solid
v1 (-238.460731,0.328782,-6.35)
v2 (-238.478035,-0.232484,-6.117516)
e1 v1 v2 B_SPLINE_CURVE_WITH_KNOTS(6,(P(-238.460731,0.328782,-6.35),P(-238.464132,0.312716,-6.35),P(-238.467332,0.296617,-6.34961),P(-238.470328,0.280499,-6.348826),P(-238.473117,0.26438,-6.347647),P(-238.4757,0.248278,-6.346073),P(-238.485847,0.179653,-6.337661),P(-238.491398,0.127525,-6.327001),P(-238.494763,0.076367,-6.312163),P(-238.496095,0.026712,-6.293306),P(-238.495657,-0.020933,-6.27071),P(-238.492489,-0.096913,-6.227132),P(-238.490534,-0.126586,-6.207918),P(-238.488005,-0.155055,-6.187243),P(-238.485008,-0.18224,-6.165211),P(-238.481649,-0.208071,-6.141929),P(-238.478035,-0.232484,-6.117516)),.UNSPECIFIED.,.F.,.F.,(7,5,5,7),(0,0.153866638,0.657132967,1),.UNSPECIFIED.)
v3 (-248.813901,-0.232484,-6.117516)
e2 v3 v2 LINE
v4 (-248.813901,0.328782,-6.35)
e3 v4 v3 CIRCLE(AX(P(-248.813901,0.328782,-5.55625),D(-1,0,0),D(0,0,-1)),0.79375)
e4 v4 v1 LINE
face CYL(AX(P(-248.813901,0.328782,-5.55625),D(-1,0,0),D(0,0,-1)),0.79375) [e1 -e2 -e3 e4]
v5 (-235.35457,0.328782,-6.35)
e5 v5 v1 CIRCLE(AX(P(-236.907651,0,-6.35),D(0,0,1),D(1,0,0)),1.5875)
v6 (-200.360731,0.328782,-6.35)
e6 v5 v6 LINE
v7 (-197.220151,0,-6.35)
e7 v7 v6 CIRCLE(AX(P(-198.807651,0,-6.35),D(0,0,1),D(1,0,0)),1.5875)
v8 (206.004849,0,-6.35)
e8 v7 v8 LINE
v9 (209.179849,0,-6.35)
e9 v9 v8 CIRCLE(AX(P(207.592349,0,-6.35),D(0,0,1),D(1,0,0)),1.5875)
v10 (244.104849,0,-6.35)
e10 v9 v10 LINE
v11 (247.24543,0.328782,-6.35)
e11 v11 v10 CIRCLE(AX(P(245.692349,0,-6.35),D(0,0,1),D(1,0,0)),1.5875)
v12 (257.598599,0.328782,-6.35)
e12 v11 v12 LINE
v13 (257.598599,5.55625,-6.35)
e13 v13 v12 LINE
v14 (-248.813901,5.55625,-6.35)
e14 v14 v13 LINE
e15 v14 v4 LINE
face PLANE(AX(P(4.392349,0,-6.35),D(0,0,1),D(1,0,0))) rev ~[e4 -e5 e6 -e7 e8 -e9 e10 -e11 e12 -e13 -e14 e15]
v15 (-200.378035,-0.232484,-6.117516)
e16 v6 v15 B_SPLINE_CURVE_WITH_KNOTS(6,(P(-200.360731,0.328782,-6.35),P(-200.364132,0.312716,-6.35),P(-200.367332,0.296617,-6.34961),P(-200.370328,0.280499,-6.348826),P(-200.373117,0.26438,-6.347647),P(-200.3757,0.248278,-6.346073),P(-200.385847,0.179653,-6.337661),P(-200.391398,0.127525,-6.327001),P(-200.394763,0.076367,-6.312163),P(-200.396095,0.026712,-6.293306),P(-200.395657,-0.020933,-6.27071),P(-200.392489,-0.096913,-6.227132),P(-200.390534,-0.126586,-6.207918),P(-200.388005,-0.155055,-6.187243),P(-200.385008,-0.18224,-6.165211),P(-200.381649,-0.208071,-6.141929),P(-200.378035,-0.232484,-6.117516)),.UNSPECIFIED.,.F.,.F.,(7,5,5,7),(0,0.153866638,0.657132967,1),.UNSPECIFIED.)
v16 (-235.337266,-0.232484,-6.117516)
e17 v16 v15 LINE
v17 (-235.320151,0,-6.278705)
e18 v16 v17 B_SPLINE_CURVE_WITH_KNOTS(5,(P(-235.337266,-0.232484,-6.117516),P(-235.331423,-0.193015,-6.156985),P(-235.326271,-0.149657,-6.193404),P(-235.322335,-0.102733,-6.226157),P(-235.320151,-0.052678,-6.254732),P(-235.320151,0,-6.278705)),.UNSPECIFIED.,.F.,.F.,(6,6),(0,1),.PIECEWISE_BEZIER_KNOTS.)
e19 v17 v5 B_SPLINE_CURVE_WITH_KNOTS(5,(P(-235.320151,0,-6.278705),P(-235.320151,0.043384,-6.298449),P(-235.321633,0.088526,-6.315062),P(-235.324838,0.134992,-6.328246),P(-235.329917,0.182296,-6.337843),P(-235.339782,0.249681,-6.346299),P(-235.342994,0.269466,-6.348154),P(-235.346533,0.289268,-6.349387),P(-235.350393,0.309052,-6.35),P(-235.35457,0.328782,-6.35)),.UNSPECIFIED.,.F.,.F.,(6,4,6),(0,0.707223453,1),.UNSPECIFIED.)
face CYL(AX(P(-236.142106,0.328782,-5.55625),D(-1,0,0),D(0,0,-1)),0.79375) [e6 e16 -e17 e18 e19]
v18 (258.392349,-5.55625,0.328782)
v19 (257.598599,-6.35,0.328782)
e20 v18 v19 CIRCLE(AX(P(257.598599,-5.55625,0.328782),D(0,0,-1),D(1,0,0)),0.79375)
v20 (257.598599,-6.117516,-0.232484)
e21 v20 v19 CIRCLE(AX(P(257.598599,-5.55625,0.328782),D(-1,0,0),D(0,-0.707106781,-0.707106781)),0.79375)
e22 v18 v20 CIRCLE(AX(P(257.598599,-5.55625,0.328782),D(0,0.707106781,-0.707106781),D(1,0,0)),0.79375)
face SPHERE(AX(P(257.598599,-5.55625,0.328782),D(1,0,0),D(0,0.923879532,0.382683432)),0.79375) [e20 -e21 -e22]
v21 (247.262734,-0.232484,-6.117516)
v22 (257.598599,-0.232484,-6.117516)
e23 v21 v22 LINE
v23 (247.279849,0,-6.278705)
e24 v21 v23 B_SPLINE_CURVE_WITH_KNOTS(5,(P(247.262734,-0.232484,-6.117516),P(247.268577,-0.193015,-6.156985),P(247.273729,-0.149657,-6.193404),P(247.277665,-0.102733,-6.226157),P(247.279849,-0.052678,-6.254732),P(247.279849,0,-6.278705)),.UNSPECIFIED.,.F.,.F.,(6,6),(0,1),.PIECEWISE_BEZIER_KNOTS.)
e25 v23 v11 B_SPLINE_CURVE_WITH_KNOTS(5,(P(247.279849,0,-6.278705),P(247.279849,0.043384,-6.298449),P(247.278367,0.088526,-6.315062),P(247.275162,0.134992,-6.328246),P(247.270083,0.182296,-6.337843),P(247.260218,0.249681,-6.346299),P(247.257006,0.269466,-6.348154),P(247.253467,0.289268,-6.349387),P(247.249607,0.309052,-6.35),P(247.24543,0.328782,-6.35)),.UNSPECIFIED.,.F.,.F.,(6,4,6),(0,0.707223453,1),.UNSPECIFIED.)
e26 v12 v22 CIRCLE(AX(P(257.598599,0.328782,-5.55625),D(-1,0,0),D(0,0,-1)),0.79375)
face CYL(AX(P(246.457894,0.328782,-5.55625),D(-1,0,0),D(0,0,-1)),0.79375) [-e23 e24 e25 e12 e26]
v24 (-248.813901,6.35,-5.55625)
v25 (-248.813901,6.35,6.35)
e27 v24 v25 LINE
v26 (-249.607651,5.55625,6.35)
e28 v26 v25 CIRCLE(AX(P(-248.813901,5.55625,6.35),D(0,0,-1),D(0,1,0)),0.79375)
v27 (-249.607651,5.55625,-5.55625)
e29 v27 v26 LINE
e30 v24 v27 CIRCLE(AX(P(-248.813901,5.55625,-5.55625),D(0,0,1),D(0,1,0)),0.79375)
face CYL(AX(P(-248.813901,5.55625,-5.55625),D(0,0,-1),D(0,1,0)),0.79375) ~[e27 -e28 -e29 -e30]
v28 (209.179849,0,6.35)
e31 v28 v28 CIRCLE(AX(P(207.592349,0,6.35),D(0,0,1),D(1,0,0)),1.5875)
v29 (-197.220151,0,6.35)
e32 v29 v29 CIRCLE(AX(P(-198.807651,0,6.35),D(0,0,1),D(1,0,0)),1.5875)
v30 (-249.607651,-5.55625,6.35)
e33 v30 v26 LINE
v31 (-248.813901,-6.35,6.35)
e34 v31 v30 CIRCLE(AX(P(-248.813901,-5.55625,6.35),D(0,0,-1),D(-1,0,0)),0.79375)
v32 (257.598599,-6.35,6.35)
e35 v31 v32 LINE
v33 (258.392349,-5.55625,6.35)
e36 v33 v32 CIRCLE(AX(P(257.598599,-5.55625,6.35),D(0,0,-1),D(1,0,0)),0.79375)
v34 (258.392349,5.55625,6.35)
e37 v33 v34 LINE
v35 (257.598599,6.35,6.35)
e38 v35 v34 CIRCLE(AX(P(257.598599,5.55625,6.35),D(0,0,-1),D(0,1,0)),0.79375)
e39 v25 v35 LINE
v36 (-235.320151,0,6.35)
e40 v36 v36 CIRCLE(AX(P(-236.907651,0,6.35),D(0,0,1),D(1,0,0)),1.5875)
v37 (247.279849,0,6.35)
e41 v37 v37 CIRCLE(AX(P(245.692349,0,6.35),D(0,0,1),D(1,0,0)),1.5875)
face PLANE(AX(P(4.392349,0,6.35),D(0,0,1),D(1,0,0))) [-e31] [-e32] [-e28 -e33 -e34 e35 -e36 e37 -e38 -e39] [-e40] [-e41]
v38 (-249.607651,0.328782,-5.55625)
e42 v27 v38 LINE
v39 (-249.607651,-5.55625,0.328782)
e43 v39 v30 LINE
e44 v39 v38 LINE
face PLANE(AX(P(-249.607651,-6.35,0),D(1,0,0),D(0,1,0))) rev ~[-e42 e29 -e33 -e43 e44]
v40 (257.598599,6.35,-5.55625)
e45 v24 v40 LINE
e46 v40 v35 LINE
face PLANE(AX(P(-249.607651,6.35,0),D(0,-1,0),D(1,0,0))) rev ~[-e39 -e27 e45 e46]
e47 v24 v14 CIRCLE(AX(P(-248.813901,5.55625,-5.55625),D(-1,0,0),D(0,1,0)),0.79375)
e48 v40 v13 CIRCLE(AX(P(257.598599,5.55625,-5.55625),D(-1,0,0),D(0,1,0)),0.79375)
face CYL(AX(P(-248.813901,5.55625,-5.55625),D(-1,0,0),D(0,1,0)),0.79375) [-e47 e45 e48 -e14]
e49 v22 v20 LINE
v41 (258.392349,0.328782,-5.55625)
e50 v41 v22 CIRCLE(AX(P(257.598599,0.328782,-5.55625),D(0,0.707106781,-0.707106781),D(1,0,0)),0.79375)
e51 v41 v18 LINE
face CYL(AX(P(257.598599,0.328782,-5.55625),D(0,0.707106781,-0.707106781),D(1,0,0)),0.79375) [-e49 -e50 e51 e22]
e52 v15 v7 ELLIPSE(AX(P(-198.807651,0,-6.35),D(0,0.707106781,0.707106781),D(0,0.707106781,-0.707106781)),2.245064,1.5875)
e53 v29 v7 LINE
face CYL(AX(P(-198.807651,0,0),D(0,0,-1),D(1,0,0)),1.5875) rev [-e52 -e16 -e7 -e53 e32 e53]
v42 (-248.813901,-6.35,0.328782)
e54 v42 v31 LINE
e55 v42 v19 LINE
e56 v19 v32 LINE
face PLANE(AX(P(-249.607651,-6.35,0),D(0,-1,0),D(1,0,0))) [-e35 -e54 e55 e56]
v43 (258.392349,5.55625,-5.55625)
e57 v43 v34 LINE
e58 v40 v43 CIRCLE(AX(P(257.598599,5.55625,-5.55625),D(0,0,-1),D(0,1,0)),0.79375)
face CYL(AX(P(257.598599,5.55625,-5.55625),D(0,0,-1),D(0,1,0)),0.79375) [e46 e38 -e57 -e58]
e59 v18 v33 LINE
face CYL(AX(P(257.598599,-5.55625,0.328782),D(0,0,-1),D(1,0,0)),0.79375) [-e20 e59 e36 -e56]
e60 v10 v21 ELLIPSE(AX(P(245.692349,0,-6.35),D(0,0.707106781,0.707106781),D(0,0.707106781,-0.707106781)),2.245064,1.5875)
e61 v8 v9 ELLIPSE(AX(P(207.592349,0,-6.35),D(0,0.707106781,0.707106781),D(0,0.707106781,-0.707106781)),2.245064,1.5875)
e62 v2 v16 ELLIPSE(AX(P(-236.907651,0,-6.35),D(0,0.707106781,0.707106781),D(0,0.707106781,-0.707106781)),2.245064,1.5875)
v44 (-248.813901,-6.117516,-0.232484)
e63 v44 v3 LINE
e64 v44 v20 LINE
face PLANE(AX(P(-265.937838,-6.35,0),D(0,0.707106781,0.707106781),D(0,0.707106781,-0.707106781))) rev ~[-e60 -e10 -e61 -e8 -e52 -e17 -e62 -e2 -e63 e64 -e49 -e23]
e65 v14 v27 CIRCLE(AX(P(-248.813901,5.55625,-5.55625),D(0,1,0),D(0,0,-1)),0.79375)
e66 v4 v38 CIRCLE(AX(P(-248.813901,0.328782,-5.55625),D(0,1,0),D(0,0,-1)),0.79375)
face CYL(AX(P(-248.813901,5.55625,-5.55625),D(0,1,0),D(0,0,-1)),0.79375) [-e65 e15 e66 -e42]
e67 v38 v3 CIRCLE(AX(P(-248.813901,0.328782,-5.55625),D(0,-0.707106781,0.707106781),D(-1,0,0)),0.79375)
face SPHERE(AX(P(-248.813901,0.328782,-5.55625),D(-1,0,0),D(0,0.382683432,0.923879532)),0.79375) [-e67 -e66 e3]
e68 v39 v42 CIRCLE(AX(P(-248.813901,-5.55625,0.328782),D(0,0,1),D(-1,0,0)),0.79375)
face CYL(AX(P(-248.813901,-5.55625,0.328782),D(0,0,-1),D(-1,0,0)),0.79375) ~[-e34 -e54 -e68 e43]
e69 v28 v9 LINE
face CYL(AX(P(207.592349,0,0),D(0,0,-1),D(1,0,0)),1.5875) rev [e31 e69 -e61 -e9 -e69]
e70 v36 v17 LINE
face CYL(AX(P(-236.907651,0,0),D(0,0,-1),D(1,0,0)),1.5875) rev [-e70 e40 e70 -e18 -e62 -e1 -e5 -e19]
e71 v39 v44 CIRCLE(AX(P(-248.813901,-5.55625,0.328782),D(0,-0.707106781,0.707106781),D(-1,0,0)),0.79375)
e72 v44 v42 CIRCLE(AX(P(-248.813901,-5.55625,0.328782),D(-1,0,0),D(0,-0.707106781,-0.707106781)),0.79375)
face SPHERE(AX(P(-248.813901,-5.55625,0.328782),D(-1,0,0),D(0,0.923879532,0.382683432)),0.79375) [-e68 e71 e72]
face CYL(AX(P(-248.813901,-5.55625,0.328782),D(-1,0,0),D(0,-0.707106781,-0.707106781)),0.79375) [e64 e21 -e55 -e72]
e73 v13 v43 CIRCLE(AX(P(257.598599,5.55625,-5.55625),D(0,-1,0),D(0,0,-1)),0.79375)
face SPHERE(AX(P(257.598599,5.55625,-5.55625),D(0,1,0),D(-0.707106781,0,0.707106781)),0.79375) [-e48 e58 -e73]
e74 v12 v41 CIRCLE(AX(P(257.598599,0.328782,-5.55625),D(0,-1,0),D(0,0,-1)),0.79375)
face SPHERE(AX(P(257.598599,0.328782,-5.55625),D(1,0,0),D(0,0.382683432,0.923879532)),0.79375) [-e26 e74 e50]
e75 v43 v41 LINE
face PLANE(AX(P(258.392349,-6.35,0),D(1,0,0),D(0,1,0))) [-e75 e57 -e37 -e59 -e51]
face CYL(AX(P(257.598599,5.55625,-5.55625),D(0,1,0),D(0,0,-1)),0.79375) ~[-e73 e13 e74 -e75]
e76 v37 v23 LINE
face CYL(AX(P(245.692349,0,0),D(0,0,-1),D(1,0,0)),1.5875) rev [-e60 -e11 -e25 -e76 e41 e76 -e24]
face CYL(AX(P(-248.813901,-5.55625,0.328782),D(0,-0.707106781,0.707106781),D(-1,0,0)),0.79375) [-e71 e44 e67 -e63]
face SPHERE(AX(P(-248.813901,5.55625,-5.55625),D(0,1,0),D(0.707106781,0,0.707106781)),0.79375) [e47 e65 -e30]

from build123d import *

# Parameters (mm, degrees)
F0_W         = 508
F0_H         = 12.7
F0_R         = 1.5875
F1_DEPTH     = 6.35
F2_T1_DEPTH  = 540.6603739472
F3_T1_DEPTH  = 8.3226920908
F3_T3_DEPTH  = 8.0055929849
F3_T5_DEPTH  = 5.2274679849
F3_T7_DEPTH  = 13.890625
F3_T9_DEPTH  = 8.3226920908
F3_T11_DEPTH = 506.4125
F3_T13_DEPTH = 11.1407050378
F3_T15_DEPTH = 36.5689100757
F3_T17_DEPTH = 11.1407050378
F3_T22_DEPTH = 0.809625
F3_T28_DEPTH = 0.809625
F3_S33_W     = 0.809625
F3_S33_H     = 0.809625
F3_T34_DEPTH = 0.809625
F3_T40_DEPTH = 0.809625
F3_T46_DEPTH = 0.809625
F3_S51_W     = 0.809625
F3_S51_H     = 0.809625
F3_T52_DEPTH = 0.809625


# Not quite as in the source:
# - a fillet or chamfer that OpenCascade refuses, or shapes differently, is made with other operations: its cross-section is extruded or revolved along the edge and cut away or added


with BuildPart() as f1:
    # F0 (on Top) → F1 (new body, symmetric)
    with BuildSketch(Plane.XY):
        with Locations((4.392349353, 0)):
            Rectangle(F0_W, F0_H)
        with Locations((-236.907650647, 0)):
            Circle(F0_R, mode=Mode.SUBTRACT)
        with Locations((-198.807650647, 0)):
            Circle(F0_R, mode=Mode.SUBTRACT)
        with Locations((207.592349353, 0)):
            Circle(F0_R, mode=Mode.SUBTRACT)
        with Locations((245.692349353, 0)):
            Circle(F0_R, mode=Mode.SUBTRACT)
    extrude(amount=F1_DEPTH, both=True)

    # F2: chamfer of 6.35 on 1 edges, made by hand

    # F2_s2 → F2_t1 (cut)
    with BuildSketch(Plane.YZ.offset(-265.9378376206)):
        Polygon((-6.35, 0), (0, -6.35), (-6.35, -6.35), align=None)
    extrude(amount=F2_T1_DEPTH, mode=Mode.SUBTRACT)

    # F3: fillet of radius 0.79375 on 13 edges, made by hand

    # F3_s2 → F3_t1 (cut)
    with BuildSketch(Plane(origin=(0, 2.9425160076, -2.9425160076), x_dir=(1, 0, 0), z_dir=(0, -0.7071067812, 0.7071067812))):
        with BuildLine():
            ThreePointArc((258.392349353, -3.6963780605), (258.1598653606, -4.2576440681), (257.598599353, -4.4901280605))
            Line((257.598599353, -4.4901280605), (258.392349353, -4.4901280605))
            Line((258.392349353, -4.4901280605), (258.392349353, -3.6963780605))
        make_face()
    extrude(amount=F3_T1_DEPTH, mode=Mode.SUBTRACT)

    # F3_s4 → F3_t3 (cut)
    with BuildSketch(Plane.XY.offset(0.3287820151)):
        with BuildLine():
            ThreePointArc((258.392349353, -5.55625), (258.1598653606, -6.1175160076), (257.598599353, -6.35))
            Line((257.598599353, -6.35), (258.392349353, -6.35))
            Line((258.392349353, -6.35), (258.392349353, -5.55625))
        make_face()
        with BuildLine():
            ThreePointArc((-249.607650647, -5.55625), (-249.3751666546, -6.1175160076), (-248.813900647, -6.35))
            Line((-248.813900647, -6.35), (-249.607650647, -6.35))
            Line((-249.607650647, -6.35), (-249.607650647, -5.55625))
        make_face()
    extrude(amount=F3_T3_DEPTH, mode=Mode.SUBTRACT)

    # F3_s6 → F3_t5 (cut)
    with BuildSketch(Plane.XZ.offset(-5.55625)):
        with BuildLine():
            ThreePointArc((257.598599353, -6.35), (258.1598653606, -6.1175160076), (258.392349353, -5.55625))
            Line((258.392349353, -5.55625), (258.392349353, -6.35))
            Line((258.392349353, -6.35), (257.598599353, -6.35))
        make_face()
        with BuildLine():
            ThreePointArc((-248.813900647, -6.35), (-249.3751666546, -6.1175160076), (-249.607650647, -5.55625))
            Line((-249.607650647, -5.55625), (-249.607650647, -6.35))
            Line((-249.607650647, -6.35), (-248.813900647, -6.35))
        make_face()
    extrude(amount=F3_T5_DEPTH, mode=Mode.SUBTRACT)

    # F3_s8 → F3_t7 (cut)
    with BuildSketch(Plane.XY.offset(-5.55625)):
        with BuildLine():
            ThreePointArc((257.598599353, 6.35), (258.1598653606, 6.1175160076), (258.392349353, 5.55625))
            Line((258.392349353, 5.55625), (258.392349353, 6.35))
            Line((258.392349353, 6.35), (257.598599353, 6.35))
        make_face()
        with BuildLine():
            ThreePointArc((-248.813900647, 6.35), (-249.3751666546, 6.1175160076), (-249.607650647, 5.55625))
            Line((-249.607650647, 5.55625), (-249.607650647, 6.35))
            Line((-249.607650647, 6.35), (-248.813900647, 6.35))
        make_face()
    extrude(amount=F3_T7_DEPTH, mode=Mode.SUBTRACT)

    # F3_s10 → F3_t9 (cut)
    with BuildSketch(Plane(origin=(0, -2.9425160076, 2.9425160076), x_dir=(1, 0, 0), z_dir=(0, 0.7071067812, -0.7071067812))):
        with BuildLine():
            ThreePointArc((-249.607650647, 3.6963780605), (-249.3751666546, 4.2576440681), (-248.813900647, 4.4901280605))
            Line((-248.813900647, 4.4901280605), (-249.607650647, 4.4901280605))
            Line((-249.607650647, 4.4901280605), (-249.607650647, 3.6963780605))
        make_face()
    extrude(amount=F3_T9_DEPTH, mode=Mode.SUBTRACT)

    # F3_s12 → F3_t11 (cut)
    with BuildSketch(Plane.YZ.offset(-248.813900647)):
        with BuildLine():
            ThreePointArc((-6.1175160076, -0.2324839924), (-6.2895793789, 0.0250270407), (-6.35, 0.3287820151))
            Line((-6.35, 0.3287820151), (-6.35, 0))
            Line((-6.35, 0), (-6.1175160076, -0.2324839924))
        make_face()
        with BuildLine():
            ThreePointArc((6.35, -5.55625), (6.1175160076, -6.1175160076), (5.55625, -6.35))
            Line((5.55625, -6.35), (6.35, -6.35))
            Line((6.35, -6.35), (6.35, -5.55625))
        make_face()
    extrude(amount=F3_T11_DEPTH, mode=Mode.SUBTRACT)

    # F3_s14 → F3_t13 (cut)
    with BuildSketch(Plane.YZ.offset(-248.813900647)):
        with BuildLine():
            ThreePointArc((0.3287820151, -6.35), (0.0250270407, -6.2895793789), (-0.2324839924, -6.1175160076))
            Line((-0.2324839924, -6.1175160076), (0, -6.35))
            Line((0, -6.35), (0.3287820151, -6.35))
        make_face()
    extrude(amount=F3_T13_DEPTH, mode=Mode.SUBTRACT)

    # F3_s16 → F3_t15 (cut)
    with BuildSketch(Plane.YZ.offset(-236.1421056848)):
        with BuildLine():
            ThreePointArc((0.3287820151, -6.35), (0.0250270407, -6.2895793789), (-0.2324839924, -6.1175160076))
            Line((-0.2324839924, -6.1175160076), (0, -6.35))
            Line((0, -6.35), (0.3287820151, -6.35))
        make_face()
    extrude(amount=F3_T15_DEPTH, mode=Mode.SUBTRACT)

    # F3_s18 → F3_t17 (cut)
    with BuildSketch(Plane.YZ.offset(246.4578943152)):
        with BuildLine():
            ThreePointArc((0.3287820151, -6.35), (0.0250270407, -6.2895793789), (-0.2324839924, -6.1175160076))
            Line((-0.2324839924, -6.1175160076), (0, -6.35))
            Line((0, -6.35), (0.3287820151, -6.35))
        make_face()
    extrude(amount=F3_T17_DEPTH, mode=Mode.SUBTRACT)


with BuildPart() as f3_tool20:
    # F3_s21 → F3_t22 (new body)
    with BuildSketch(Plane.YZ.offset(257.598599353)):
        Polygon((0.3287820151, -5.55625), (-0.2437093126, -6.1287413277), (-0.0065756403, -6.365875), (0.3287820151, -6.365875), align=None)
    extrude(amount=F3_T22_DEPTH)

    # F3_s23 → F3_t24 (revolve, cut)
    with BuildSketch(Plane(origin=(257.598599353, 0.3287820151, -5.55625), x_dir=(0, 0.3826834324, 0.9238795325), z_dir=(0, 0.9238795325, -0.3826834324))):
        with BuildLine():
            ThreePointArc((0, -0.79375), (0.79375, 0), (0, 0.79375))
            Line((0, 0.79375), (0, -0.79375))
        make_face()
    revolve(axis=Axis((257.598599353, 0.3287820151, -5.55625), (1, 0, 0)), mode=Mode.SUBTRACT)


with BuildPart() as f1_1:
    add(f1.part)

    # F3_t19: cut F3_tool20
    add(f3_tool20.part, mode=Mode.SUBTRACT)


with BuildPart() as f3_tool26:
    # F3_s27 → F3_t28 (new body)
    with BuildSketch(Plane.YZ.offset(257.598599353)):
        Polygon((-5.55625, 0.3287820151), (-6.1287413277, -0.2437093126), (-6.365875, -0.0065756403), (-6.365875, 0.3287820151), align=None)
    extrude(amount=F3_T28_DEPTH)

    # F3_s29 → F3_t30 (revolve, cut)
    with BuildSketch(Plane(origin=(257.598599353, -5.55625, 0.3287820151), x_dir=(0, 0.9238795325, 0.3826834324), z_dir=(0, 0.3826834324, -0.9238795325))):
        with BuildLine():
            ThreePointArc((0, -0.79375), (0.79375, 0), (0, 0.79375))
            Line((0, 0.79375), (0, -0.79375))
        make_face()
    revolve(axis=Axis((257.598599353, -5.55625, 0.3287820151), (1, 0, 0)), mode=Mode.SUBTRACT)


with BuildPart() as f1_2:
    add(f1_1.part)

    # F3_t25: cut F3_tool26
    add(f3_tool26.part, mode=Mode.SUBTRACT)


with BuildPart() as f3_tool32:
    # F3_s33 → F3_t34 (new body)
    with BuildSketch(Plane.XZ.offset(-5.55625)):
        with Locations((258.003411853, -5.9610625)):
            Rectangle(F3_S33_W, F3_S33_H)
    extrude(amount=-F3_T34_DEPTH)

    # F3_s35 → F3_t36 (revolve, cut)
    with BuildSketch(Plane(origin=(257.598599353, 5.55625, -5.55625), x_dir=(-0.7071067812, 0, 0.7071067812), z_dir=(-0.7071067812, 0, -0.7071067812))):
        with BuildLine():
            ThreePointArc((0, -0.79375), (0.79375, 0), (0, 0.79375))
            Line((0, 0.79375), (0, -0.79375))
        make_face()
    revolve(axis=Axis((257.598599353, 5.55625, -5.55625), (0, 1, 0)), mode=Mode.SUBTRACT)


with BuildPart() as f1_3:
    add(f1_2.part)

    # F3_t31: cut F3_tool32
    add(f3_tool32.part, mode=Mode.SUBTRACT)


with BuildPart() as f3_tool38:
    # F3_s39 → F3_t40 (new body)
    with BuildSketch(Plane.YZ.offset(-248.813900647)):
        Polygon((-5.55625, 0.3287820151), (-6.365875, 0.3287820151), (-6.365875, -0.0065756403), (-6.1287413277, -0.2437093126), align=None)
    extrude(amount=-F3_T40_DEPTH)

    # F3_s41 → F3_t42 (revolve, cut)
    with BuildSketch(Plane(origin=(-248.813900647, -5.55625, 0.3287820151), x_dir=(0, 0.9238795325, 0.3826834324), z_dir=(0, -0.3826834324, 0.9238795325))):
        with BuildLine():
            ThreePointArc((0, -0.79375), (0.79375, 0), (0, 0.79375))
            Line((0, 0.79375), (0, -0.79375))
        make_face()
    revolve(axis=Axis((-248.813900647, -5.55625, 0.3287820151), (-1, 0, 0)), mode=Mode.SUBTRACT)


with BuildPart() as f1_4:
    add(f1_3.part)

    # F3_t37: cut F3_tool38
    add(f3_tool38.part, mode=Mode.SUBTRACT)


with BuildPart() as f3_tool44:
    # F3_s45 → F3_t46 (new body)
    with BuildSketch(Plane.YZ.offset(-248.813900647)):
        Polygon((0.3287820151, -5.55625), (-0.2437093126, -6.1287413277), (-0.0065756403, -6.365875), (0.3287820151, -6.365875), align=None)
    extrude(amount=-F3_T46_DEPTH)

    # F3_s47 → F3_t48 (revolve, cut)
    with BuildSketch(Plane(origin=(-248.813900647, 0.3287820151, -5.55625), x_dir=(0, 0.3826834324, 0.9238795325), z_dir=(0, -0.9238795325, 0.3826834324))):
        with BuildLine():
            ThreePointArc((0, -0.79375), (0.79375, 0), (0, 0.79375))
            Line((0, 0.79375), (0, -0.79375))
        make_face()
    revolve(axis=Axis((-248.813900647, 0.3287820151, -5.55625), (-1, 0, 0)), mode=Mode.SUBTRACT)


with BuildPart() as f1_5:
    add(f1_4.part)

    # F3_t43: cut F3_tool44
    add(f3_tool44.part, mode=Mode.SUBTRACT)


with BuildPart() as f3_tool50:
    # F3_s51 → F3_t52 (new body)
    with BuildSketch(Plane.XZ.offset(-5.55625)):
        with Locations((-249.218713147, -5.9610625)):
            Rectangle(F3_S51_W, F3_S51_H)
    extrude(amount=-F3_T52_DEPTH)

    # F3_s53 → F3_t54 (revolve, cut)
    with BuildSketch(Plane(origin=(-248.813900647, 5.55625, -5.55625), x_dir=(0.7071067812, 0, 0.7071067812), z_dir=(-0.7071067812, 0, 0.7071067812))):
        with BuildLine():
            ThreePointArc((0, -0.79375), (0.79375, 0), (0, 0.79375))
            Line((0, 0.79375), (0, -0.79375))
        make_face()
    revolve(axis=Axis((-248.813900647, 5.55625, -5.55625), (0, 1, 0)), mode=Mode.SUBTRACT)


with BuildPart() as f1_6:
    add(f1_5.part)

    # F3_t49: cut F3_tool50
    add(f3_tool50.part, mode=Mode.SUBTRACT)


solid = f1_6.part
